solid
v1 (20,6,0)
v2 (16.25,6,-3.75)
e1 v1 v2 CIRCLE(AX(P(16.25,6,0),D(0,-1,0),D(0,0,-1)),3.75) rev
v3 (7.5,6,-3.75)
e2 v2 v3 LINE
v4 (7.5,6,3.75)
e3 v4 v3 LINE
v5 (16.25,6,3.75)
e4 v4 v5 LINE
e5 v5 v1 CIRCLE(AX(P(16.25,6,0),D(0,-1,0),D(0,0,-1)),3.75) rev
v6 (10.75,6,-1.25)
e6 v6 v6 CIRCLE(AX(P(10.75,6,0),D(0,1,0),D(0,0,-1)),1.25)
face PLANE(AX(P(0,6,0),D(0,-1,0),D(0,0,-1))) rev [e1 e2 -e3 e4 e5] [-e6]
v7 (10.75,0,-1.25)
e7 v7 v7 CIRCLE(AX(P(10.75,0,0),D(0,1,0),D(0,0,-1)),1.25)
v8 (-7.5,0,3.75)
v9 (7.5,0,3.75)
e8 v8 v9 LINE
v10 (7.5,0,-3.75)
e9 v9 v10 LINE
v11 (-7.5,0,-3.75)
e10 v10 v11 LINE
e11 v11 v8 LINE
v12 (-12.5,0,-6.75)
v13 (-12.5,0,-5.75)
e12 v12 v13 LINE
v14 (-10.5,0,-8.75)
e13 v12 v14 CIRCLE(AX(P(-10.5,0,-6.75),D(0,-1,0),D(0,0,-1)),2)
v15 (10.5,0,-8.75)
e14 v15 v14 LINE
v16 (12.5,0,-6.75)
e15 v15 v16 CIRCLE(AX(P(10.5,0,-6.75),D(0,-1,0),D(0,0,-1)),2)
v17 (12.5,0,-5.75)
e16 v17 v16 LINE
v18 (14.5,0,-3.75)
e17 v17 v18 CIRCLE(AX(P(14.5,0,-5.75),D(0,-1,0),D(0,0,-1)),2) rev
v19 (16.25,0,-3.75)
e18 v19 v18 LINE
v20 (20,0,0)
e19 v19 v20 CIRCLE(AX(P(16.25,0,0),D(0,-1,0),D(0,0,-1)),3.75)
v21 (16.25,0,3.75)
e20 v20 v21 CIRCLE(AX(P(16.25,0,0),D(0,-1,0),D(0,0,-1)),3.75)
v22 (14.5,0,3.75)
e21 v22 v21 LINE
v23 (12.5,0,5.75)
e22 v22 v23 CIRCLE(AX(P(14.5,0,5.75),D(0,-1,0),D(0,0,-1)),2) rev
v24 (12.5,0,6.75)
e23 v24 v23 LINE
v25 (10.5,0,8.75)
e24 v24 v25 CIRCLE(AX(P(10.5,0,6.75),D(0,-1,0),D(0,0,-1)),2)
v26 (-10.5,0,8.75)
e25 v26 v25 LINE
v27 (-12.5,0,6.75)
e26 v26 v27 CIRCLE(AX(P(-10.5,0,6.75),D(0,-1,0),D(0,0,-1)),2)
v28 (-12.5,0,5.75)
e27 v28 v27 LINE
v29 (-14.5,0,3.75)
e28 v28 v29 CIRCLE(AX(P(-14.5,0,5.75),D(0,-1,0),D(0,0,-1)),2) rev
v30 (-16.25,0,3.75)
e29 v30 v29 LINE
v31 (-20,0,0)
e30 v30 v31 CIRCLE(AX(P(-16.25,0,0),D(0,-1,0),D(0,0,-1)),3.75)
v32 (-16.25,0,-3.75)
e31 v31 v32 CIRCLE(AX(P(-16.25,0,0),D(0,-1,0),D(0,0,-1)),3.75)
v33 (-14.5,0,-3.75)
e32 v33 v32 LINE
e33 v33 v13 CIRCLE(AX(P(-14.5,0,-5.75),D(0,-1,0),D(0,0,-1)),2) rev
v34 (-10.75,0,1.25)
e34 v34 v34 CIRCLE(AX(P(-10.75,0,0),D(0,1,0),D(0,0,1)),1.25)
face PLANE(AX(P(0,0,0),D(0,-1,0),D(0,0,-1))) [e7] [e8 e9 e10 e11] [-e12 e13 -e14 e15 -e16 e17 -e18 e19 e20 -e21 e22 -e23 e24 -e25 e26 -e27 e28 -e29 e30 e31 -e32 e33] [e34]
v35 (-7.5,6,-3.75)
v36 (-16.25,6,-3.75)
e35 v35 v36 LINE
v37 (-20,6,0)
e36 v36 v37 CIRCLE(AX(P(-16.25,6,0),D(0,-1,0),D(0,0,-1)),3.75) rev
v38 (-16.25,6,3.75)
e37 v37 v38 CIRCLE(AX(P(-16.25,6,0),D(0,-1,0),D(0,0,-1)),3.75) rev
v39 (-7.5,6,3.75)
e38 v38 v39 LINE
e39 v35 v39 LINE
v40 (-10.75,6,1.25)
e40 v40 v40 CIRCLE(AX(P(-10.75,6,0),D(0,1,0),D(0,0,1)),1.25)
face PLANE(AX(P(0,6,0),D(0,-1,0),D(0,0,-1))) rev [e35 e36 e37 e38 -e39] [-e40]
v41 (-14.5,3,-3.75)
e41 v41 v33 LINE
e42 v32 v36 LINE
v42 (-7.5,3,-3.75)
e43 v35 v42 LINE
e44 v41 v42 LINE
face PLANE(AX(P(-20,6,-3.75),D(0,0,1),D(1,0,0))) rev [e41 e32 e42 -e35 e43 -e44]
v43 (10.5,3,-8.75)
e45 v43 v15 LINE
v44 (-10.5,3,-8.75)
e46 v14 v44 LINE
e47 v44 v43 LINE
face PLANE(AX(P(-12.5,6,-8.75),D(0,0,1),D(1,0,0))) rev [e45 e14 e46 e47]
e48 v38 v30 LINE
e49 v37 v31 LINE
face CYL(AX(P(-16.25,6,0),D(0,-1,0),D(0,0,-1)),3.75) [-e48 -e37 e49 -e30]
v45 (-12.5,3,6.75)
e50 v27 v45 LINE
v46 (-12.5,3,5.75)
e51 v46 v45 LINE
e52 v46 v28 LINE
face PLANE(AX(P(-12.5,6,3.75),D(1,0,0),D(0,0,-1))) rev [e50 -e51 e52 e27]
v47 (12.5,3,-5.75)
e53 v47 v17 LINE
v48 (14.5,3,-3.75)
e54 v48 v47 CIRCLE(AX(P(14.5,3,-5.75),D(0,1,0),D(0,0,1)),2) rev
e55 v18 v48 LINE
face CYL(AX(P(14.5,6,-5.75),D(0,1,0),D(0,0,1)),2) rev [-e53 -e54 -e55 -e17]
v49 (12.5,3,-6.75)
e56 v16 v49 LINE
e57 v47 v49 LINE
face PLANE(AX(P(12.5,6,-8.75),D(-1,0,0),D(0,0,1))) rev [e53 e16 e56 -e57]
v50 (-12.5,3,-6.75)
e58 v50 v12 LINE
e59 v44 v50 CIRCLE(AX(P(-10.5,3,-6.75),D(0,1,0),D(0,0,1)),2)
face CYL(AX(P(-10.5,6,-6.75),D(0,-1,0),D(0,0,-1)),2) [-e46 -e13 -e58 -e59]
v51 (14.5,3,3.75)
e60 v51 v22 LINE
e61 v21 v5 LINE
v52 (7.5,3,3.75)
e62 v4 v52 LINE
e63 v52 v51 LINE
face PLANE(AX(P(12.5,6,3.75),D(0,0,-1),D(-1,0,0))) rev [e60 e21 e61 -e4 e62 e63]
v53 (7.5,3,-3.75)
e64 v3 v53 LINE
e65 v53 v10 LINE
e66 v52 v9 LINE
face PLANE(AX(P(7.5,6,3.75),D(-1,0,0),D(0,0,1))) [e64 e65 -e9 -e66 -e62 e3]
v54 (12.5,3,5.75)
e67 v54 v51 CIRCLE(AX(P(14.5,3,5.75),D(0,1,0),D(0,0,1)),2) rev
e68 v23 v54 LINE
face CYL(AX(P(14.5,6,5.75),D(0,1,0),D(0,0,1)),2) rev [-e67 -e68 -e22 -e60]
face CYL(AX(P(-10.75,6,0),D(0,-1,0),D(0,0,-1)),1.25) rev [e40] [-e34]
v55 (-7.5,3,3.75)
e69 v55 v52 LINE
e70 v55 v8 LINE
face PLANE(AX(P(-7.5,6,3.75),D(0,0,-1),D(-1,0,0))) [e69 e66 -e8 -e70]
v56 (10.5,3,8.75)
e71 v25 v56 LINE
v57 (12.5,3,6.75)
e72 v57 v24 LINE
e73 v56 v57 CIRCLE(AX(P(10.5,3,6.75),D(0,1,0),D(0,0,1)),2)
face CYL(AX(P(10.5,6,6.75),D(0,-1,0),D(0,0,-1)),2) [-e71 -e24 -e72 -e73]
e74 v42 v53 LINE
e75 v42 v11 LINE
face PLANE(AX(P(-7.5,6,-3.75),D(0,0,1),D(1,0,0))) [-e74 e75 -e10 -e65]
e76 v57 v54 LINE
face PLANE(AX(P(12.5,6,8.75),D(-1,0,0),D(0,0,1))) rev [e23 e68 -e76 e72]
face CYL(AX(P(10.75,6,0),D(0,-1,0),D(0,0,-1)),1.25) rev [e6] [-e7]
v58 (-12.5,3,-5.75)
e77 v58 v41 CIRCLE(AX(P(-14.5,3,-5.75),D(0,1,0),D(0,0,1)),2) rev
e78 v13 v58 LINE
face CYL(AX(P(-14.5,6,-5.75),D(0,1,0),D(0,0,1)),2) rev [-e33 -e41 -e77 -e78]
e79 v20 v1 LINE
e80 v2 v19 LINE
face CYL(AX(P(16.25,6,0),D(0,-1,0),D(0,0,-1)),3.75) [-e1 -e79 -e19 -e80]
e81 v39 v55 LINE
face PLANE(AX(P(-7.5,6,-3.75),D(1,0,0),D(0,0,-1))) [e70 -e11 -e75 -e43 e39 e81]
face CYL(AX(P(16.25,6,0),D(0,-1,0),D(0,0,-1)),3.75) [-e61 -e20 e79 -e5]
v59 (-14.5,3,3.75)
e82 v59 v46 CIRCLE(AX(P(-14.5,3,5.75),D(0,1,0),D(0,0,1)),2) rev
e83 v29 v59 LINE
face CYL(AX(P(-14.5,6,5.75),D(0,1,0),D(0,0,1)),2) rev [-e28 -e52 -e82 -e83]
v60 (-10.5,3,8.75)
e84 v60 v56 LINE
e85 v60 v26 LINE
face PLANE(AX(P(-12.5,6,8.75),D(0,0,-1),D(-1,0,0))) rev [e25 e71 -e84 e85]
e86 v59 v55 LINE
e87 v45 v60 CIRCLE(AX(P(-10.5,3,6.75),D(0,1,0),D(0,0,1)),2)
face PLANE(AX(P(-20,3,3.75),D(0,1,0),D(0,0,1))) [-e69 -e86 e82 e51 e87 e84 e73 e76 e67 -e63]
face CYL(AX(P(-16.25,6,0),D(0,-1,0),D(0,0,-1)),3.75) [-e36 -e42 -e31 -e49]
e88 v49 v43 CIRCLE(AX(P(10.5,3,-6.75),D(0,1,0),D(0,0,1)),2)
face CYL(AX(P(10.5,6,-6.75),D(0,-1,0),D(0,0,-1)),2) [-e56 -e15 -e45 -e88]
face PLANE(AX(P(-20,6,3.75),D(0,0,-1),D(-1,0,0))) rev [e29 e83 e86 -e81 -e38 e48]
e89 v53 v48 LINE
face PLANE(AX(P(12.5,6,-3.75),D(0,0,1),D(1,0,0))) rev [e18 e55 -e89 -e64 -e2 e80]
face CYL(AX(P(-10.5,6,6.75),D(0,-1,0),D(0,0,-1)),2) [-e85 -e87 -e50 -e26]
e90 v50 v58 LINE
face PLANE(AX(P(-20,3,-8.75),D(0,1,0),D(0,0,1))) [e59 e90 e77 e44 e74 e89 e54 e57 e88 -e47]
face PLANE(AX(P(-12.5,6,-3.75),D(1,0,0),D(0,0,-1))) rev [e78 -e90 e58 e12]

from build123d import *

# Parameters (mm, degrees)
SKETCH1_W               = 15
SKETCH1_H               = 7.5
BOSS_EXTRUDE1_DEPTH     = 6
SKETCH2_R               = 1.25
CUT_EXTRUDE1_DEPTH      = 6
FILLET1_R               = 3.75
CUT_EXTRUDE2_DEPTH      = 23.639843197
CUT_EXTRUDE2_DEPTH_BACK = 23.639843197
SKETCH3_W               = 5
SKETCH3_H               = 3
FILLET2_R               = 2


with BuildPart() as part:
    # Sketch1 → Boss-Extrude1 (new body)
    with BuildSketch(Plane(origin=(0, 0, 0), x_dir=(1, 0, 0), z_dir=(0, 1, 0))):
        Polygon((-20, 3.75), (-12.5, 3.75), (-12.5, 8.75), (12.5, 8.75), (12.5, 3.75), (20, 3.75), (20, -3.75), (12.5, -3.75), (12.5, -8.75), (-12.5, -8.75), (-12.5, -3.75), (-20, -3.75), align=None)
        Rectangle(SKETCH1_W, SKETCH1_H, mode=Mode.SUBTRACT)
    extrude(amount=BOSS_EXTRUDE1_DEPTH)

    # Sketch2 → Cut-Extrude1 (cut)
    with BuildSketch(Plane(origin=(0, 0, 0), x_dir=(1, 0, 0), z_dir=(0, 1, 0))):
        with Locations(Location((-10.75, 0, 0), (0, 0, 270))):
            Circle(SKETCH2_R)
        with Locations(Location((10.75, 0, 0), (0, 0, 90))):
            Circle(SKETCH2_R)
    extrude(amount=CUT_EXTRUDE1_DEPTH, mode=Mode.SUBTRACT)

    # Fillet1
    fillet1_edges = [part.edges().sort_by_distance(p)[0] for p in [
        (-20, 3, 3.75),
        (-20, 3, -3.75),
        (20, 3, 3.75),
        (20, 3, -3.75),
    ]]
    fillet(fillet1_edges, radius=FILLET1_R - 0.0001)  # a hair under: the kernel refuses the full size

    # Sketch3 → Cut-Extrude2 (cut, two sides: drawn at the far end of the back side and taken through both)
    with BuildSketch(Plane(origin=(0, 0, 0), x_dir=(0, 0, -1), z_dir=(1, 0, 0)).offset(-CUT_EXTRUDE2_DEPTH_BACK)):
        with Locations((6.25, 4.5)):
            Rectangle(SKETCH3_W, SKETCH3_H)
        with Locations((-6.25, 4.5)):
            Rectangle(SKETCH3_W, SKETCH3_H)
    extrude(amount=CUT_EXTRUDE2_DEPTH + CUT_EXTRUDE2_DEPTH_BACK, mode=Mode.SUBTRACT)

    # Fillet2
    fillet2_edges = [part.edges().sort_by_distance(p)[0] for p in [
        (12.5, 1.5, 3.75),
        (12.5, 1.5, 8.75),
        (-12.5, 1.5, 8.75),
        (-12.5, 1.5, 3.75),
        (-12.5, 1.5, -3.75),
        (-12.5, 1.5, -8.75),
        (12.5, 1.5, -8.75),
        (12.5, 1.5, -3.75),
    ]]
    fillet(fillet2_edges, radius=FILLET2_R)


solid = part.part
